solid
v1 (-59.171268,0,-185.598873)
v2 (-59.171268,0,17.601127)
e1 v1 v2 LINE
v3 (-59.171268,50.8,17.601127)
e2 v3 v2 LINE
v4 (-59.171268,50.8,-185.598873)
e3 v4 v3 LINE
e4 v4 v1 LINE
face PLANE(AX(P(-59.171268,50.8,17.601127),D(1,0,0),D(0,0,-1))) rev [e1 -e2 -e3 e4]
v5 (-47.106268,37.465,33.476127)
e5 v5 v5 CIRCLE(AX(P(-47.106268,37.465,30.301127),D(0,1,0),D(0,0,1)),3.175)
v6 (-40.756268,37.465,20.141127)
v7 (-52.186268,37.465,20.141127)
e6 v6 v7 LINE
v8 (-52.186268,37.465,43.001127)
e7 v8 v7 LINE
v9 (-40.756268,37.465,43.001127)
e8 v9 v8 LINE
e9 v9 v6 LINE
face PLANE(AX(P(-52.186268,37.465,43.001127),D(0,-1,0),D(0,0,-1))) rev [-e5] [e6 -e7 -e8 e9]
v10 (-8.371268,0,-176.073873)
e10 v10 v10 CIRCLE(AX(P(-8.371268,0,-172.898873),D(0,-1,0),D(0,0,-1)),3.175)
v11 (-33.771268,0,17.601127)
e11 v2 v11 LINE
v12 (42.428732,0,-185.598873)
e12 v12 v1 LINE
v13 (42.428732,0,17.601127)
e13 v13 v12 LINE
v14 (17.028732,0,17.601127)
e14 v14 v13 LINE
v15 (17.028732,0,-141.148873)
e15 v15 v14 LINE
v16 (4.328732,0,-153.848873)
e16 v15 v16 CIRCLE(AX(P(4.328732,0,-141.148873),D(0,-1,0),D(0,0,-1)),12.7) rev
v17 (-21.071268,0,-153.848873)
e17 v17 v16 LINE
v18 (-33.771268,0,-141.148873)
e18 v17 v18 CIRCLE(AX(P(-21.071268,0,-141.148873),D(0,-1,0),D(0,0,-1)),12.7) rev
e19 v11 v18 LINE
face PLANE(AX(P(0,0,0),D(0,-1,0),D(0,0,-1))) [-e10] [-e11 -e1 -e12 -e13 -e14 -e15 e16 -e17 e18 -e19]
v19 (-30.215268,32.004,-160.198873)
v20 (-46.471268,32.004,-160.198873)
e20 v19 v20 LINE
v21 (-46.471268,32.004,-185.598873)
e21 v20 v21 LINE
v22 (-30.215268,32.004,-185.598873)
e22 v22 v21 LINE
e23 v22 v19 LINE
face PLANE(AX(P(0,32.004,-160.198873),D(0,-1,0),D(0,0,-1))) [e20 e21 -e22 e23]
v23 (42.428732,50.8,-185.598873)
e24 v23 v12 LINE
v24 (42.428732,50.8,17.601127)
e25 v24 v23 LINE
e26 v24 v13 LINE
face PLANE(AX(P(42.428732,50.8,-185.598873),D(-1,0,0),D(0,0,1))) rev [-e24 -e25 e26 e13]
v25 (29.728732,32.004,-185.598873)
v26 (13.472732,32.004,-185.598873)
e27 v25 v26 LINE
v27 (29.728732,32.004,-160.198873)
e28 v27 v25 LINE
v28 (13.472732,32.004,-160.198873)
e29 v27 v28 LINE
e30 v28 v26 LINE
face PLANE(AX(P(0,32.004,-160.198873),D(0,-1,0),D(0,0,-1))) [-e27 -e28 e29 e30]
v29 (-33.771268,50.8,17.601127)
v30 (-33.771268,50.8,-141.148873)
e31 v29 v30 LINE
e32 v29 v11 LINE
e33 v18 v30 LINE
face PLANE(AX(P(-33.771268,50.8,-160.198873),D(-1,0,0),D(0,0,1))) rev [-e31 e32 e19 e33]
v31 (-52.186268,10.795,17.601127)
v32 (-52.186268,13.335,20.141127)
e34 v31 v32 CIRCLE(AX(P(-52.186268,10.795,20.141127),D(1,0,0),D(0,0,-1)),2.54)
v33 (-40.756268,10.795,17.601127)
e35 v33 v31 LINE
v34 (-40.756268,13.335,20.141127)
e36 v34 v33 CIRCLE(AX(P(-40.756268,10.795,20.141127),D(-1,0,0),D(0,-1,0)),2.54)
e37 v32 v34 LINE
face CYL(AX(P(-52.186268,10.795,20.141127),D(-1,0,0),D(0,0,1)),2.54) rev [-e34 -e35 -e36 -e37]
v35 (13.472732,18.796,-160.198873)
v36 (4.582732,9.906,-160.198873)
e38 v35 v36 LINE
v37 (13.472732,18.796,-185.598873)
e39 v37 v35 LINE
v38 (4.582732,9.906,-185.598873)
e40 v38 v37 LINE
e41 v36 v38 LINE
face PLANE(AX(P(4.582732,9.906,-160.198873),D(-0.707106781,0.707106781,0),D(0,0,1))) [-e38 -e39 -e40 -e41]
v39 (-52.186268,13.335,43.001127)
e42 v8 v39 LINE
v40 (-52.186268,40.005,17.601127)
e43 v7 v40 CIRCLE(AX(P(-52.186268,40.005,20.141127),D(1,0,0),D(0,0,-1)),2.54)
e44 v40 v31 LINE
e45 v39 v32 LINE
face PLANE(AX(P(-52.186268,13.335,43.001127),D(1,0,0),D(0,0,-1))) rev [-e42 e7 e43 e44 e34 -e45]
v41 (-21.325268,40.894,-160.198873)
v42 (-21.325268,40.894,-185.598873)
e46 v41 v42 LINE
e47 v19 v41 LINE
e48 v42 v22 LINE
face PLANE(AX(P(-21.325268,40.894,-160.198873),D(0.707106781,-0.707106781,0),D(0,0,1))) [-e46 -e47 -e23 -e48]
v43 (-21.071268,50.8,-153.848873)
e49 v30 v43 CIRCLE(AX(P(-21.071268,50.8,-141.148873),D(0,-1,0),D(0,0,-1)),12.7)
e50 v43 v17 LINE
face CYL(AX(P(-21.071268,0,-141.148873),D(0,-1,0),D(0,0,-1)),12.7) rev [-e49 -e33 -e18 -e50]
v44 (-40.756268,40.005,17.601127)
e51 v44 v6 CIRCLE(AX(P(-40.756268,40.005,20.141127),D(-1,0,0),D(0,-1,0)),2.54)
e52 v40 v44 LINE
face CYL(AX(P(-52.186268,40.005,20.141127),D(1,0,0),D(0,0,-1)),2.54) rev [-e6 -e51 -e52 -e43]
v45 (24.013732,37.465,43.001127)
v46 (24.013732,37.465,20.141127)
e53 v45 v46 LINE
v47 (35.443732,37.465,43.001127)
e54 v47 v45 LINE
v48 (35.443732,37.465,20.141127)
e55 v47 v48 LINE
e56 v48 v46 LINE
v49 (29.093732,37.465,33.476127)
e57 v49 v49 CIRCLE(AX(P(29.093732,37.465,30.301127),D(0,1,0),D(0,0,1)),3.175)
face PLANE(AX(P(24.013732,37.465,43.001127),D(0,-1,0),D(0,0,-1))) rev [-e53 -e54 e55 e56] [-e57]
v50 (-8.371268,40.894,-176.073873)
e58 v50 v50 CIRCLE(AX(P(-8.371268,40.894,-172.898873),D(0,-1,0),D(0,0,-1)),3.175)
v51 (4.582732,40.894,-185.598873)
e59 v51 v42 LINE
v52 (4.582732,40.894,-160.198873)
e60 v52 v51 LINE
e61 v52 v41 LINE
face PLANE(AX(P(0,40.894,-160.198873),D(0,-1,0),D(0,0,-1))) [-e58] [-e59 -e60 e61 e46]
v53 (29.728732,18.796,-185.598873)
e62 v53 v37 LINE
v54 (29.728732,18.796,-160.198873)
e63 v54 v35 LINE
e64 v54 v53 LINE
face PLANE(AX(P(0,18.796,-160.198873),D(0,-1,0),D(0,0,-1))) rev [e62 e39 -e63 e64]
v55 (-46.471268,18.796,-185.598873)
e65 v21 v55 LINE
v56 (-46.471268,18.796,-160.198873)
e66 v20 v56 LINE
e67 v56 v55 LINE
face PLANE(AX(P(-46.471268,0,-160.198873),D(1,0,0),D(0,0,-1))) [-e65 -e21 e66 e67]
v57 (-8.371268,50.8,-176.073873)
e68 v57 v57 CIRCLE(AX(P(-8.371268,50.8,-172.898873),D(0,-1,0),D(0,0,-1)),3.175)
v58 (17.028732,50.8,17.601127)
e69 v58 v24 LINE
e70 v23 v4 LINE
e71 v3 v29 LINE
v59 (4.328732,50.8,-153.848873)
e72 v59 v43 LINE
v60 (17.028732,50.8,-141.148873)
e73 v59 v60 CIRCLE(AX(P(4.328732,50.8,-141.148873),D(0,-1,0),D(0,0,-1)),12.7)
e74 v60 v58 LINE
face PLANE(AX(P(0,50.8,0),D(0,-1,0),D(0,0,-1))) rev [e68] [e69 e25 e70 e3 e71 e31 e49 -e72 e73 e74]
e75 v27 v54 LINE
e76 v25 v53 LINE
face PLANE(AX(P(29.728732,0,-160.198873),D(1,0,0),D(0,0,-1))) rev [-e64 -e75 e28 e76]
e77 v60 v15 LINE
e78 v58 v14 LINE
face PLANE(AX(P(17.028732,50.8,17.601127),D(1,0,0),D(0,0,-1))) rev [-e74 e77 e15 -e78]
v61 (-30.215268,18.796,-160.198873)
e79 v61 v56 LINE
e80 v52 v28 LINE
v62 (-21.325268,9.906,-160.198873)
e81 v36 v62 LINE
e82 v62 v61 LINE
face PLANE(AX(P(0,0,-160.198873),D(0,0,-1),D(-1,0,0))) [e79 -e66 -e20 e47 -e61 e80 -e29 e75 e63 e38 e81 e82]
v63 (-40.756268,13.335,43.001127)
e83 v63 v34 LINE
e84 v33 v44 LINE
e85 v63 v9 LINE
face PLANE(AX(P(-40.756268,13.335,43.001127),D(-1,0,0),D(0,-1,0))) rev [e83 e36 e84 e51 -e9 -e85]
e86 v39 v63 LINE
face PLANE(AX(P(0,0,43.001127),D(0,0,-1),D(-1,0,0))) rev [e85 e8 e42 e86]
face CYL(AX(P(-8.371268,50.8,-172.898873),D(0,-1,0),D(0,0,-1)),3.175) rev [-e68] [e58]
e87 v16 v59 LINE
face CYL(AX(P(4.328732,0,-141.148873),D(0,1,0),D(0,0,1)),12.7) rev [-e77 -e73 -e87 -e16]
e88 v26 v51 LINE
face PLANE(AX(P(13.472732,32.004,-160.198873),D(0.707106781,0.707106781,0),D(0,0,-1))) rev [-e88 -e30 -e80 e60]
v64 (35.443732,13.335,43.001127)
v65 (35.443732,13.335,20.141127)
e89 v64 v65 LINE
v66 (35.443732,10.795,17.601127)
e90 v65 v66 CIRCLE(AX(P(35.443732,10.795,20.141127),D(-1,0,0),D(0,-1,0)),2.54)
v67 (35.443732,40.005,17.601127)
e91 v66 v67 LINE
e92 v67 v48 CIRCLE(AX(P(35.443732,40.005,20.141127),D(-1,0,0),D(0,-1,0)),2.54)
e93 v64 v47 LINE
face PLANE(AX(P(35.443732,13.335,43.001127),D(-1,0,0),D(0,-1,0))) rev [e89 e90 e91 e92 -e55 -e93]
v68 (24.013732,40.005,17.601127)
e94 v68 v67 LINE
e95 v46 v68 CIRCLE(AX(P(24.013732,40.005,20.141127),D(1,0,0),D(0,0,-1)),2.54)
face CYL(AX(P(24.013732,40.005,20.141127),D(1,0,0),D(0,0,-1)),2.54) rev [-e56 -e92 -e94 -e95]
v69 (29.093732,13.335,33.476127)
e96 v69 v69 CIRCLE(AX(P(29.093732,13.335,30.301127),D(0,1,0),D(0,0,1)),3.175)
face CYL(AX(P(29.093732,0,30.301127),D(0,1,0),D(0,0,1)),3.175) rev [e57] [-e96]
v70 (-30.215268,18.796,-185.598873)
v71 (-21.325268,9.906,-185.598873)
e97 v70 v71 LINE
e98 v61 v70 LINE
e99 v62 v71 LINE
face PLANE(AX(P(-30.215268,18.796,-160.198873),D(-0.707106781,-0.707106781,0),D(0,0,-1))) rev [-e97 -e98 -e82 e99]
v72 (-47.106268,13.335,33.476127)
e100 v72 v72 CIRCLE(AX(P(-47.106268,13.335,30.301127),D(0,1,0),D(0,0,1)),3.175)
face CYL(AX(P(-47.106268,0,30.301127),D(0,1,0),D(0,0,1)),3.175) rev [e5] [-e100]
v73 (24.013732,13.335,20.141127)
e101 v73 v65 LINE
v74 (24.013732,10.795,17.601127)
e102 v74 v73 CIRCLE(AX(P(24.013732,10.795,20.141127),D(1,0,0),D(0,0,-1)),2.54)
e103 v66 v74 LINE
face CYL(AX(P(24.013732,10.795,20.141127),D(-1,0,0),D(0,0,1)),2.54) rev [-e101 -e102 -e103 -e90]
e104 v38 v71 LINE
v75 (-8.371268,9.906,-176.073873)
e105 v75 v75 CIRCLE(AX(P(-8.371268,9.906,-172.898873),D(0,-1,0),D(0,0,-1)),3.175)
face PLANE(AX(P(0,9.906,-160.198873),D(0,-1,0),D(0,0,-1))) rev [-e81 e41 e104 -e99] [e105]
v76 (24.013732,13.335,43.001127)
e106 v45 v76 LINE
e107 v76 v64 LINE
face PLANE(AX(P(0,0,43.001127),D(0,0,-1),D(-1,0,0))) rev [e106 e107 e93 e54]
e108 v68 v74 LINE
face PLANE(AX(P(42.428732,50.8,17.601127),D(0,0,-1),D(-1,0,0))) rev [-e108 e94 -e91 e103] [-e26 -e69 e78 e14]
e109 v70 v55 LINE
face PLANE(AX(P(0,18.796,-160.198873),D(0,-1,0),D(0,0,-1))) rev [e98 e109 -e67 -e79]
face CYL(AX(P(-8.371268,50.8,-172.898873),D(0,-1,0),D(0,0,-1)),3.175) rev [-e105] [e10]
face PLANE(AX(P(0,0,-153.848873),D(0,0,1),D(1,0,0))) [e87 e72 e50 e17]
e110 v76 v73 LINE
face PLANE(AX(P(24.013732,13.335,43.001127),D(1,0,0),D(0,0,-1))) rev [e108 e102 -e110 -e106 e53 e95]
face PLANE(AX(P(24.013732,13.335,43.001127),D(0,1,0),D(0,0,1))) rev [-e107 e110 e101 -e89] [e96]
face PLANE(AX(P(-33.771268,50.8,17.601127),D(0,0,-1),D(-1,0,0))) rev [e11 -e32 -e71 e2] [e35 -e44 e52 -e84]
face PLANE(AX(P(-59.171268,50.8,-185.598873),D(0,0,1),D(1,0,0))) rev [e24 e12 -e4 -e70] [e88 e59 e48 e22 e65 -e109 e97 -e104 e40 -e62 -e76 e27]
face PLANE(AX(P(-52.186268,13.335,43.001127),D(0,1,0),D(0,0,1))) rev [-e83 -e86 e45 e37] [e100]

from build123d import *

# Parameters (mm, degrees)
BOSS_EXTRUDE1_DEPTH = 50.8
SKETCH2_W           = 11.43
SKETCH2_H           = 24.13
BOSS_EXTRUDE2_DEPTH = 25.4
FILLET3_R           = 2.54
SKETCH3_R           = 3.175
CUT_EXTRUDE1_DEPTH  = 199.372898559
SKETCH4_W           = 25.146
SKETCH4_H           = 13.208
SKETCH4_W_2         = 25.908
SKETCH4_H_2         = 8.89
CUT_EXTRUDE2_DEPTH  = 25.4
CHAMFER1_SIZE       = 8.89
SKETCH5_R           = 3.175
CUT_EXTRUDE3_DEPTH  = 202.317710741
SKETCH7_W           = 50.8
SKETCH7_H           = 50.8
BOSS_EXTRUDE4_DEPTH = 6.35
FILLET4_R           = 12.7


with BuildPart() as part:
    # Sketch1 → Boss-Extrude1 (new body)
    with BuildSketch(Plane(origin=(0, 0, 0), x_dir=(1, 0, 0), z_dir=(0, 1, 0))):
        Polygon((-59.171267606, -17.601126761), (-59.171267606, 185.598873239), (42.428732394, 185.598873239), (42.428732394, -17.601126761), (17.028732394, -17.601126761), (17.028732394, 160.198873239), (-33.771267606, 160.198873239), (-33.771267606, -17.601126761), align=None)
    extrude(amount=BOSS_EXTRUDE1_DEPTH)

    # Sketch2 → Boss-Extrude2 (add)
    with BuildSketch(Plane.XY.offset(17.601126761)):
        with Locations((-46.471267606, 25.4)):
            Rectangle(SKETCH2_W, SKETCH2_H)
        with Locations((29.728732394, 25.4)):
            Rectangle(SKETCH2_W, SKETCH2_H)
    extrude(amount=BOSS_EXTRUDE2_DEPTH)

    # Fillet3
    fillet3_edges = [part.edges().sort_by_distance(p)[0] for p in [
        (-46.471267606, 37.465, 17.601126761),
        (-46.471267606, 13.335, 17.601126761),
        (29.728732394, 37.465, 17.601126761),
        (29.728732394, 13.335, 17.601126761),
    ]]
    fillet(fillet3_edges, radius=FILLET3_R)

    # Sketch3 → Cut-Extrude1 (cut, through all)
    with BuildSketch(Plane(origin=(0, 37.465, 0), x_dir=(1, 0, 0), z_dir=(0, 1, 0))):
        with Locations(Location((-47.106267606, -30.301126761, 0), (0, 0, 270))):
            Circle(SKETCH3_R)
        with Locations(Location((29.093732394, -30.301126761, 0), (0, 0, 270))):
            Circle(SKETCH3_R)
    extrude(amount=-CUT_EXTRUDE1_DEPTH, mode=Mode.SUBTRACT)

    # Sketch4 → Cut-Extrude2 (cut)
    with BuildSketch(Plane(origin=(0, 0, -185.598873239), x_dir=(-1, 0, 0), z_dir=(0, 0, -1))):
        with Locations((-17.155732394, 25.4)):
            Rectangle(SKETCH4_W, SKETCH4_H)
        with Locations((8.371267606, 25.4)):
            Rectangle(SKETCH4_W_2, SKETCH4_H)
        with Locations((8.371267606, 36.449)):
            Rectangle(SKETCH4_W_2, SKETCH4_H_2)
        with Locations((33.898267606, 25.4)):
            Rectangle(SKETCH4_W, SKETCH4_H)
        with Locations((8.371267606, 14.351)):
            Rectangle(SKETCH4_W_2, SKETCH4_H_2)
    extrude(amount=-CUT_EXTRUDE2_DEPTH, mode=Mode.SUBTRACT)

    # Chamfer1
    chamfer1_edges = [part.edges().sort_by_distance(p)[0] for p in [
        (-21.325267606, 32.004, -172.898873239),
        (-21.325267606, 18.796, -172.898873239),
        (4.582732394, 18.796, -172.898873239),
        (4.582732394, 32.004, -172.898873239),
    ]]
    chamfer(chamfer1_edges, length=CHAMFER1_SIZE - 0.0001)  # a hair under: the kernel refuses the full size

    # Sketch5 → Cut-Extrude3 (cut, through all)
    with BuildSketch(Plane.XZ):
        with Locations(Location((-8.371267606, -172.898873239, 0), (0, 0, 270))):
            Circle(SKETCH5_R)
    extrude(amount=-CUT_EXTRUDE3_DEPTH, mode=Mode.SUBTRACT)

    # Sketch7 → Boss-Extrude4 (add)
    with BuildSketch(Plane.XY.offset(-160.198873239)):
        with Locations((-8.371267606, 25.4)):
            Rectangle(SKETCH7_W, SKETCH7_H)
    extrude(amount=BOSS_EXTRUDE4_DEPTH)

    # Fillet4
    fillet4_edges = [part.edges().sort_by_distance(p)[0] for p in [
        (-33.771267606, 25.4, -153.848873239),
        (17.028732394, 25.4, -153.848873239),
    ]]
    fillet(fillet4_edges, radius=FILLET4_R)


solid = part.part
